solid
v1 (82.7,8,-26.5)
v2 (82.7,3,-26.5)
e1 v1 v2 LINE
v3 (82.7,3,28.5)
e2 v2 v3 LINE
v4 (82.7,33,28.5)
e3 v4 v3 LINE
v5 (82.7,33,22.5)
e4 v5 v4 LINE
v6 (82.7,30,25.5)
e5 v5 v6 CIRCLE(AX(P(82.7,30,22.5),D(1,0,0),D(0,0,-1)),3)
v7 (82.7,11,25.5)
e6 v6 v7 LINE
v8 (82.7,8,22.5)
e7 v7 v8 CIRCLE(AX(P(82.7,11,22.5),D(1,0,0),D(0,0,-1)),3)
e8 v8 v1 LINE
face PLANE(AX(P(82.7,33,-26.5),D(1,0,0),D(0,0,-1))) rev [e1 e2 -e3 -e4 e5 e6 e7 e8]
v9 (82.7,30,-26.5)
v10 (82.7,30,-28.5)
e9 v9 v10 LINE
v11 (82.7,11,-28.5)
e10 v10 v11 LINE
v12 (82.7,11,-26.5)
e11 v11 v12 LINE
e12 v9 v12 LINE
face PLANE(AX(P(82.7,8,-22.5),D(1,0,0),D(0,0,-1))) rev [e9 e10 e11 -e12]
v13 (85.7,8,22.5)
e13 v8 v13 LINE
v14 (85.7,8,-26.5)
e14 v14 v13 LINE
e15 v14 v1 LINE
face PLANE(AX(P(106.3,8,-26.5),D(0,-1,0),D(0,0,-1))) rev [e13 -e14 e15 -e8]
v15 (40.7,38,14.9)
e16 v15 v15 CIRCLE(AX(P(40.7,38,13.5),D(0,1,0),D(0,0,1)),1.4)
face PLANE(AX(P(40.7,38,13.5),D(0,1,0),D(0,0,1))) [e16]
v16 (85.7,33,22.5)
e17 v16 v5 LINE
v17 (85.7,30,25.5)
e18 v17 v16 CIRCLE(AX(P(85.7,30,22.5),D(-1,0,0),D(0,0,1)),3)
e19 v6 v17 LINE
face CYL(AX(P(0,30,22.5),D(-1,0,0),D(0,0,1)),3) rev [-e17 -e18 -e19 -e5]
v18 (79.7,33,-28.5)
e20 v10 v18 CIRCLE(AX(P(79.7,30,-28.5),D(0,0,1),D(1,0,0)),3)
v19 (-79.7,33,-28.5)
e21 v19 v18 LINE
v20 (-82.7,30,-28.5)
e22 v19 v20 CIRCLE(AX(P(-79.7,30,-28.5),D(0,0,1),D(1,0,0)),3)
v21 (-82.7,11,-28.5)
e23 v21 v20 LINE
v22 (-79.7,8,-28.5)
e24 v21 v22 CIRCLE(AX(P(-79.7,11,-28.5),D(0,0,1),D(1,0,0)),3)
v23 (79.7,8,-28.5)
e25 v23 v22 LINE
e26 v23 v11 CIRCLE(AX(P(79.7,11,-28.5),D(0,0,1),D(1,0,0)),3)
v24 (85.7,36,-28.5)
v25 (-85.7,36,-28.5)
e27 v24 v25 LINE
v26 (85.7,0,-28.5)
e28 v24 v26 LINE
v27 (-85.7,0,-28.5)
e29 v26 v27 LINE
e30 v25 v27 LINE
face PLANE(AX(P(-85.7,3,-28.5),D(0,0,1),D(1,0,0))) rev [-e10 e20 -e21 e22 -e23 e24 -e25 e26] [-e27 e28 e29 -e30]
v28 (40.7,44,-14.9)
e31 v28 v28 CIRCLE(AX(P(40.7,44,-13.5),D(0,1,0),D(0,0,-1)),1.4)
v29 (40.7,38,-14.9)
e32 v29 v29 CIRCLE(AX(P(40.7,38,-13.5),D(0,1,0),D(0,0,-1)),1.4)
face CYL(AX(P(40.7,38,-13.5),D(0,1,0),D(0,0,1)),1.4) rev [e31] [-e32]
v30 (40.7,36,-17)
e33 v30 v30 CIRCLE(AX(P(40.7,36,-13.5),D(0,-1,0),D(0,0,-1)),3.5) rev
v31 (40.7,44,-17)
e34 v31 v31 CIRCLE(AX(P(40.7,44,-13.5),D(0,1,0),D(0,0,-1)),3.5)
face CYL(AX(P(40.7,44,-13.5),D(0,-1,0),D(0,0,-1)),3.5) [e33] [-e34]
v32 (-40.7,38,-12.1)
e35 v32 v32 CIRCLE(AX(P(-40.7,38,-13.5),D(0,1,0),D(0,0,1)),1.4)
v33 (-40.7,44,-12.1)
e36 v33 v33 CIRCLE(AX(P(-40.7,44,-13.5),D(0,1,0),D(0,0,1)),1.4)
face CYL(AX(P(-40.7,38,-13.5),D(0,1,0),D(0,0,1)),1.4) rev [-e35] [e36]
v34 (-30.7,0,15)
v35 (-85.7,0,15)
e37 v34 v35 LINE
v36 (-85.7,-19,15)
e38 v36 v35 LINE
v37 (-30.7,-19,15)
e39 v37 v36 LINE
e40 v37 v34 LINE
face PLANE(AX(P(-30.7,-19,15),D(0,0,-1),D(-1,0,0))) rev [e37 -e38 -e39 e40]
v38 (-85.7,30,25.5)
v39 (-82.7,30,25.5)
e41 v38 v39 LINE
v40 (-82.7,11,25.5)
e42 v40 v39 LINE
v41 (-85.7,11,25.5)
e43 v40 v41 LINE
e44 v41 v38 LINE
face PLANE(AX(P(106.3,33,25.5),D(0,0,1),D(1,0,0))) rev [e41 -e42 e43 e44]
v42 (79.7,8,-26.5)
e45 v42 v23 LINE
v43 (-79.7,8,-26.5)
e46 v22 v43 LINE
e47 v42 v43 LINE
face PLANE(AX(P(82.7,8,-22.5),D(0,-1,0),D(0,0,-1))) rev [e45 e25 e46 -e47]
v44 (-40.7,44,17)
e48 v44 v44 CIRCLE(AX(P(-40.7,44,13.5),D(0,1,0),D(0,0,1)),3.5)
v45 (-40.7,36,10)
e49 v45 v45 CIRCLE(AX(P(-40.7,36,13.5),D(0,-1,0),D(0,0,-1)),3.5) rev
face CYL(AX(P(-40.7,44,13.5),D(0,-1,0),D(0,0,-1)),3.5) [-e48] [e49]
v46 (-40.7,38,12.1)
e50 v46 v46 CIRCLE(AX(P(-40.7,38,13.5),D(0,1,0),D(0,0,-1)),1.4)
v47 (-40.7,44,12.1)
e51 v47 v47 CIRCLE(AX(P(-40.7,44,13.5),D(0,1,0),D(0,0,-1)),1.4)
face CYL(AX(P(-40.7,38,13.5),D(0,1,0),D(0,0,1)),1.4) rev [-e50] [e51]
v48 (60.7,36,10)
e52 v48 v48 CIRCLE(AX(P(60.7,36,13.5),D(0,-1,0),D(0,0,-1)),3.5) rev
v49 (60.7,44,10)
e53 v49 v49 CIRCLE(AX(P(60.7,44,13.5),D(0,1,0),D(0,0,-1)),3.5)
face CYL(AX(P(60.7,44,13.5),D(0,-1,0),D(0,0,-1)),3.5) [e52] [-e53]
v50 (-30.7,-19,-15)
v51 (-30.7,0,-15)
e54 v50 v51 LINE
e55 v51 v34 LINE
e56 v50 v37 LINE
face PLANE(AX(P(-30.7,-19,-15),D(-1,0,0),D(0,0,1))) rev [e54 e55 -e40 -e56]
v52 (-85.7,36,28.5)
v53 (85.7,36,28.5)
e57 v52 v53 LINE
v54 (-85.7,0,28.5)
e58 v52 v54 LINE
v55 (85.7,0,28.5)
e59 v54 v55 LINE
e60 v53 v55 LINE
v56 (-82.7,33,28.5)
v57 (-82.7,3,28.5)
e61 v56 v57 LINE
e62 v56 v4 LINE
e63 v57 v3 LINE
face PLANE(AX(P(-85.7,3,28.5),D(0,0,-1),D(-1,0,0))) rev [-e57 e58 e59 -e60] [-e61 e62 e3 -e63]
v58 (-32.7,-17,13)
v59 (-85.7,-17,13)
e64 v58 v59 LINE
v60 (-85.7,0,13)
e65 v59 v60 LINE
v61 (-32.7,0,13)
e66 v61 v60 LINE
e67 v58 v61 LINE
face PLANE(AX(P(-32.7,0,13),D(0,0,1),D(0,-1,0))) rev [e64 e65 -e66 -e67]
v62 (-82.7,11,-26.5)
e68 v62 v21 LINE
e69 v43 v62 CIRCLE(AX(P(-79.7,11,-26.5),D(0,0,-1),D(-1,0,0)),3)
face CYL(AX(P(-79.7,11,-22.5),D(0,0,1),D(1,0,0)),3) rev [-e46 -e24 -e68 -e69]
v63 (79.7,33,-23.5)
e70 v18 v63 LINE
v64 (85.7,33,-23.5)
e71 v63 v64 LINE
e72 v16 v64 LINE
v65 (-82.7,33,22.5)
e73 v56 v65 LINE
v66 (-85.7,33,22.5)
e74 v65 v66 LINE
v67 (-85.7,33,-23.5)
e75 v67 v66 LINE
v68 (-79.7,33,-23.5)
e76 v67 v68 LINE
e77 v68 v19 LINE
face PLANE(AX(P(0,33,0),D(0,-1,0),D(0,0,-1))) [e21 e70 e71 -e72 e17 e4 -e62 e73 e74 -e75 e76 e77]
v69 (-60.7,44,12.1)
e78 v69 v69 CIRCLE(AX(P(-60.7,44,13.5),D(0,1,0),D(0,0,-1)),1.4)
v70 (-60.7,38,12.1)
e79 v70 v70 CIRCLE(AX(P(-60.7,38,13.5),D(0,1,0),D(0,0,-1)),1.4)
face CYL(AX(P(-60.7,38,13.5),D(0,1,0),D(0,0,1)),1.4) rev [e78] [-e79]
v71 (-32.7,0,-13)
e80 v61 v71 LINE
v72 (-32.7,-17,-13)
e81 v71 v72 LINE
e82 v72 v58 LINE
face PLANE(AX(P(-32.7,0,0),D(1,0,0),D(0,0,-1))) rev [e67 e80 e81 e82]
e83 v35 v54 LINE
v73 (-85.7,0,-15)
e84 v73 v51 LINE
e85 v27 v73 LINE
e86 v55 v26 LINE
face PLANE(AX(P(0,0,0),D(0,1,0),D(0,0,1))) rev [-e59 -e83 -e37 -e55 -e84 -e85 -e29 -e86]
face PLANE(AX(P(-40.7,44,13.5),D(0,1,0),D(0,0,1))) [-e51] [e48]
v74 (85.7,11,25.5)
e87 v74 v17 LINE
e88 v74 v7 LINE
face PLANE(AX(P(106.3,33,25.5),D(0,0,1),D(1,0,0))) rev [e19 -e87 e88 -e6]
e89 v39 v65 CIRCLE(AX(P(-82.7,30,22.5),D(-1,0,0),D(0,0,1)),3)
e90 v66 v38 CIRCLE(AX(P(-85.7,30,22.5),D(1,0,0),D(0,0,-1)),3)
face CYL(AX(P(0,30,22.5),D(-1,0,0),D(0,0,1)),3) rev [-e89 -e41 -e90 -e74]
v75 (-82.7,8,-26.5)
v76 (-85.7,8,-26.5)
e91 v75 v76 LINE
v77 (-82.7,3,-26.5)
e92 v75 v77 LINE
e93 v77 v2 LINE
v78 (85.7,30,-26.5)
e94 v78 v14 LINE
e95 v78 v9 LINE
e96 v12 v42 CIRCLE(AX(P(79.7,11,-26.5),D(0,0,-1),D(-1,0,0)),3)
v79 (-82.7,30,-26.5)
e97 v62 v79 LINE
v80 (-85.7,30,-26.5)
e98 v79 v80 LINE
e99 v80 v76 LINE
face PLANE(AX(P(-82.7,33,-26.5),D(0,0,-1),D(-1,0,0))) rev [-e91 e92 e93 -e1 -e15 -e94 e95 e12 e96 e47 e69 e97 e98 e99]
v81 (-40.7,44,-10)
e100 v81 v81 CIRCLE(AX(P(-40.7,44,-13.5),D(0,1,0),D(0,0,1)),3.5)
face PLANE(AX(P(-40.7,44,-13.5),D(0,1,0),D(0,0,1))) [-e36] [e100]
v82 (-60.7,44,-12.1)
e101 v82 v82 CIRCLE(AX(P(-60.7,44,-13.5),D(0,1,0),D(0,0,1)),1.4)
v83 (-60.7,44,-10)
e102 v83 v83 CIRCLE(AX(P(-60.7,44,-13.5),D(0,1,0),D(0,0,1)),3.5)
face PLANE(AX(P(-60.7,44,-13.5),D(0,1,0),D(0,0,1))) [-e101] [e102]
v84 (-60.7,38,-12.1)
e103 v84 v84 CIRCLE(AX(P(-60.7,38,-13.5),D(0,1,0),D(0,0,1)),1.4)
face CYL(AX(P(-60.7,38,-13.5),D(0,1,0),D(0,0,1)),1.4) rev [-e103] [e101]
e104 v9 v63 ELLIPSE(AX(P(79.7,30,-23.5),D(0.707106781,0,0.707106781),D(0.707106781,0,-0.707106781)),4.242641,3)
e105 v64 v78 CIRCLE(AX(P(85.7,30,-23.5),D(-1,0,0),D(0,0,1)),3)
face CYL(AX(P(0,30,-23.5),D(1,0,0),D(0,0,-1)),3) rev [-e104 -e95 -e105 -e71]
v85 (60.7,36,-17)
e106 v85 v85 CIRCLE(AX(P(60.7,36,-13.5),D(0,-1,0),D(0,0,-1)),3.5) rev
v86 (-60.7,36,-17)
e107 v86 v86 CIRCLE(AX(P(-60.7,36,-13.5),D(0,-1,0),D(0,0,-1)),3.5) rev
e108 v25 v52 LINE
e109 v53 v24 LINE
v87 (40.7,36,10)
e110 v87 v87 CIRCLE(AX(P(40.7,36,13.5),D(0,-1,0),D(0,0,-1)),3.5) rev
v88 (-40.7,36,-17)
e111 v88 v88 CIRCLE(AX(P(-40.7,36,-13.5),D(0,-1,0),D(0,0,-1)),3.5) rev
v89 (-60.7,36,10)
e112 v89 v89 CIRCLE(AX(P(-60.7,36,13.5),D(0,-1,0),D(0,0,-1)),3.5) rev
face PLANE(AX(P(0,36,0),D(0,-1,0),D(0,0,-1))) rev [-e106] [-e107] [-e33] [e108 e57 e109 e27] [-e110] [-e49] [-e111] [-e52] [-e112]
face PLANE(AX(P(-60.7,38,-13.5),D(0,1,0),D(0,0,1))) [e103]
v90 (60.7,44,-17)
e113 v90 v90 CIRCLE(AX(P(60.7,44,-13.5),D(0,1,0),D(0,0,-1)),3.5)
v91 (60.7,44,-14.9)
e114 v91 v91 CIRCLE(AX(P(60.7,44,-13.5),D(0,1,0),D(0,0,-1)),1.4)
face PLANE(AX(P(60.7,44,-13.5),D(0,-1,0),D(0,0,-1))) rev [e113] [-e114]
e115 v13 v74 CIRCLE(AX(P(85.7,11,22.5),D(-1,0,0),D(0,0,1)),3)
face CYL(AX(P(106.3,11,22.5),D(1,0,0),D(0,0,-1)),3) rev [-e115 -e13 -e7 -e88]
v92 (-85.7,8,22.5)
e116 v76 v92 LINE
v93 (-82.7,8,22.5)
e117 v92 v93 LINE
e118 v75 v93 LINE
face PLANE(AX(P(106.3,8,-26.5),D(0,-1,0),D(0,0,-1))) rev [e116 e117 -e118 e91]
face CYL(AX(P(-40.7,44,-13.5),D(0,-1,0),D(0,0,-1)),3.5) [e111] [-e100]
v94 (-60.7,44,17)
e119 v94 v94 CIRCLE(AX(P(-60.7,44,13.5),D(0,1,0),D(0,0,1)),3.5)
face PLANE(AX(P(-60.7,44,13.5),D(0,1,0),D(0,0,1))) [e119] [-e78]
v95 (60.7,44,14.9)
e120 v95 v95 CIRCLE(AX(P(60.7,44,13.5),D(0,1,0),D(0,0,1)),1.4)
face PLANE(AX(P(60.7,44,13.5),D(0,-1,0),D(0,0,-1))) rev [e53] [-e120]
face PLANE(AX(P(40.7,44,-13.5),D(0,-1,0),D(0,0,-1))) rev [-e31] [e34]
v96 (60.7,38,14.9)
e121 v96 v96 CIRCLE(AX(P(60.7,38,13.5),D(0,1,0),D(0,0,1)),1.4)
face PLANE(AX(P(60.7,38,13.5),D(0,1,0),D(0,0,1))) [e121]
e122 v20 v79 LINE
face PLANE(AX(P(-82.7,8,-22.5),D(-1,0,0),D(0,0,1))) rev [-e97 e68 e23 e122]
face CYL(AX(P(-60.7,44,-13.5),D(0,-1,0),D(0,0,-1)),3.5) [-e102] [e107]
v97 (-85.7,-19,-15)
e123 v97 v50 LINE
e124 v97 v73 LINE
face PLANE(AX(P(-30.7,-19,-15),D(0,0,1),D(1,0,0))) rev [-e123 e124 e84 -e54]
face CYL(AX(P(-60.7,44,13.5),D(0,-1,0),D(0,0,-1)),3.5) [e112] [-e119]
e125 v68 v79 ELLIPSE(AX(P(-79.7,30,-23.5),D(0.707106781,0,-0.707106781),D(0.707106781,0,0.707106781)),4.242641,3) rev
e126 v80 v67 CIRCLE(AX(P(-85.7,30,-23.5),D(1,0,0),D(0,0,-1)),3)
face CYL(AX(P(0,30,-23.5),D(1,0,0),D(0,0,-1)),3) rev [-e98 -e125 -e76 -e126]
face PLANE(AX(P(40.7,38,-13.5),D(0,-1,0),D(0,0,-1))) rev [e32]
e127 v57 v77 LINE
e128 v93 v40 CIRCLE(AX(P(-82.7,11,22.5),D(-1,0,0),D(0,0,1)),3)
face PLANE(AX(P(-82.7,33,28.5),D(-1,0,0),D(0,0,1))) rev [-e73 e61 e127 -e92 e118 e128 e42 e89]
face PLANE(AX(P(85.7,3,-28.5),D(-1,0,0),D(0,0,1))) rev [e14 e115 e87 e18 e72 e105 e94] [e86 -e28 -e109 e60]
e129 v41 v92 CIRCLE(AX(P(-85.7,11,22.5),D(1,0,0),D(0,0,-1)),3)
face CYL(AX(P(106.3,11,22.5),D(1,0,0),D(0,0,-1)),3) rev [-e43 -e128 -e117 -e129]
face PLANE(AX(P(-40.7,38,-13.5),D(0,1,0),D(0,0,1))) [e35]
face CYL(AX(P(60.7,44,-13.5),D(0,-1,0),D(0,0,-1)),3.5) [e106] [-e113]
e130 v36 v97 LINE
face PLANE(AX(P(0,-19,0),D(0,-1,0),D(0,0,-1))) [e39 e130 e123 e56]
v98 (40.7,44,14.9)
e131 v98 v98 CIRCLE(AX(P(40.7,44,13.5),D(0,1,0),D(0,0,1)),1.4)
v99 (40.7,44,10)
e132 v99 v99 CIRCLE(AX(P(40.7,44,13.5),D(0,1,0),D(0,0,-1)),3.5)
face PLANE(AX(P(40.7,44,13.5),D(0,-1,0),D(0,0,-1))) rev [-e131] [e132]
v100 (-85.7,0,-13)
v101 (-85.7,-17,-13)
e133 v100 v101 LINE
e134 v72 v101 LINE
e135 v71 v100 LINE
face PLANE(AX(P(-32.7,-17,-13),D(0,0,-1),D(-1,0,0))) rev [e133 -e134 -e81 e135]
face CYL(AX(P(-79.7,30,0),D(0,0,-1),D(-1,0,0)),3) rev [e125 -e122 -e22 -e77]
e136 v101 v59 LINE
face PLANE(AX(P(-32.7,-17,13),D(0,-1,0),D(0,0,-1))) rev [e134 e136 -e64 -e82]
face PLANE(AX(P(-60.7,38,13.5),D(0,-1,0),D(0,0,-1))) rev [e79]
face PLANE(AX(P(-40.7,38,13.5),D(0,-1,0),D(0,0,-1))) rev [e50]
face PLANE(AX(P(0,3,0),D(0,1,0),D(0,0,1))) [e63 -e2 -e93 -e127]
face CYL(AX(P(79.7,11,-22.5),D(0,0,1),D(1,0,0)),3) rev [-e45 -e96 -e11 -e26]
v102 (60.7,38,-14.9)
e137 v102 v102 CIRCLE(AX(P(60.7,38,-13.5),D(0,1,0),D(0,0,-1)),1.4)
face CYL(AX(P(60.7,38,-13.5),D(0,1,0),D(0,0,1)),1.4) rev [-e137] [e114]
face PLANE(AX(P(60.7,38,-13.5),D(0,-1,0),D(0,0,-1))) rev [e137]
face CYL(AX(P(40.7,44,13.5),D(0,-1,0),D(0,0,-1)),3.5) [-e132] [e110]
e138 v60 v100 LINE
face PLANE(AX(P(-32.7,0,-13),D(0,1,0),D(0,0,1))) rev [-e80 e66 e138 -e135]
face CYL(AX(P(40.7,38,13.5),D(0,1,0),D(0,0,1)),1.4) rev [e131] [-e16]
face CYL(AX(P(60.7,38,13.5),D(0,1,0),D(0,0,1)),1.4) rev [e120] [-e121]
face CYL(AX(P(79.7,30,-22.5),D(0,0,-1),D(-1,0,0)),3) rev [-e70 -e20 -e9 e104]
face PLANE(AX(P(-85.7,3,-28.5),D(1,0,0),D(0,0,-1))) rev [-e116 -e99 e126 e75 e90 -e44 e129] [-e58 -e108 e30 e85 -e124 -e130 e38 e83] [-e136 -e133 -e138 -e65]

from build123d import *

# Parameters (mm, degrees)
SKETCH1_W           = 171.4
SKETCH1_H           = 57
BOSS_EXTRUDE1_DEPTH = 3
BOSS_EXTRUDE2_DEPTH = 30
SKETCH3_W           = 52
SKETCH3_H           = 25
CUT_EXTRUDE1_DEPTH  = 192
SKETCH4_W           = 171.4
SKETCH4_H           = 57
BOSS_EXTRUDE3_DEPTH = 3
SKETCH5_R           = 3.5
BOSS_EXTRUDE4_DEPTH = 8
SKETCH6_R           = 1.4
CUT_EXTRUDE2_DEPTH  = 6
SKETCH8_W           = 165.4
SKETCH8_H           = 25
CUT_EXTRUDE3_DEPTH  = 6
FILLET2_START       = -85.7
FILLET2_DEPTH       = 3
FILLET2_START_2     = 82.7
FILLET2_2_DEPTH     = 3
FILLET2_START_3     = -28.5
FILLET2_3_DEPTH     = 5
FILLET2_4_DEPTH     = 2
FILLET2_START_4     = -82.7
FILLET2_5_DEPTH     = 165.4
SKETCH9_W           = 55
SKETCH9_H           = 30
BOSS_EXTRUDE5_DEPTH = 19
SKETCH10_W          = 26
SKETCH10_H          = 17
CUT_EXTRUDE4_DEPTH  = 53


with BuildPart() as part:
    # Sketch1 → Boss-Extrude1 (new body)
    with BuildSketch(Plane(origin=(0, 0, 0), x_dir=(1, 0, 0), z_dir=(0, 1, 0))):
        Rectangle(SKETCH1_W, SKETCH1_H)
    extrude(amount=BOSS_EXTRUDE1_DEPTH)

    # Sketch2 → Boss-Extrude2 (add)
    with BuildSketch(Plane(origin=(0, 3, 0), x_dir=(1, 0, 0), z_dir=(0, 1, 0))):
        Polygon((-85.7, -28.5), (-82.7, -28.5), (-82.7, 26.5), (82.7, 26.5), (82.7, -28.5), (85.7, -28.5), (85.7, 28.5), (-85.7, 28.5), align=None)
    extrude(amount=BOSS_EXTRUDE2_DEPTH)

    # Sketch3 → Cut-Extrude1 (cut)
    with BuildSketch(Plane.ZY.offset(85.7)):
        with Locations((-0.5, 20.5)):
            Rectangle(SKETCH3_W, SKETCH3_H)
    extrude(amount=-CUT_EXTRUDE1_DEPTH, mode=Mode.SUBTRACT)

    # Sketch4 → Boss-Extrude3 (add)
    with BuildSketch(Plane(origin=(0, 33, 0), x_dir=(1, 0, 0), z_dir=(0, 1, 0))):
        Rectangle(SKETCH4_W, SKETCH4_H)
    extrude(amount=BOSS_EXTRUDE3_DEPTH)

    # Sketch5 → Boss-Extrude4 (add)
    with BuildSketch(Plane(origin=(0, 36, 0), x_dir=(1, 0, 0), z_dir=(0, 1, 0))):
        with Locations(Location((-60.7, 13.5, 0), (0, 0, 90))):
            Circle(SKETCH5_R)
        with Locations(Location((-40.7, 13.5, 0), (0, 0, 90))):
            Circle(SKETCH5_R)
        with Locations(Location((-40.7, -13.5, 0), (0, 0, 90))):
            Circle(SKETCH5_R)
        with Locations(Location((-60.7, -13.5, 0), (0, 0, 90))):
            Circle(SKETCH5_R)
        with Locations(Location((60.7, -13.5, 0), (0, 0, 90))):
            Circle(SKETCH5_R)
        with Locations(Location((40.7, -13.5, 0), (0, 0, 90))):
            Circle(SKETCH5_R)
        with Locations(Location((40.7, 13.5, 0), (0, 0, 90))):
            Circle(SKETCH5_R)
        with Locations(Location((60.7, 13.5, 0), (0, 0, 90))):
            Circle(SKETCH5_R)
    extrude(amount=BOSS_EXTRUDE4_DEPTH)

    # Sketch6 → Cut-Extrude2 (cut)
    with BuildSketch(Plane(origin=(0, 44, 0), x_dir=(1, 0, 0), z_dir=(0, 1, 0))):
        with Locations(Location((-60.7, 13.5, 0), (0, 0, 270))):
            Circle(SKETCH6_R)
        with Locations(Location((-40.7, 13.5, 0), (0, 0, 270))):
            Circle(SKETCH6_R)
        with Locations(Location((-40.7, -13.5, 0), (0, 0, 90))):
            Circle(SKETCH6_R)
        with Locations(Location((-60.7, -13.5, 0), (0, 0, 90))):
            Circle(SKETCH6_R)
        with Locations(Location((60.7, -13.5, 0), (0, 0, 270))):
            Circle(SKETCH6_R)
        with Locations(Location((40.7, -13.5, 0), (0, 0, 270))):
            Circle(SKETCH6_R)
        with Locations(Location((40.7, 13.5, 0), (0, 0, 90))):
            Circle(SKETCH6_R)
        with Locations(Location((60.7, 13.5, 0), (0, 0, 90))):
            Circle(SKETCH6_R)
    extrude(amount=-CUT_EXTRUDE2_DEPTH, mode=Mode.SUBTRACT)

    # Sketch8 → Cut-Extrude3 (cut)
    with BuildSketch(Plane(origin=(0, 0, -28.5), x_dir=(-1, 0, 0), z_dir=(0, 0, -1))):
        with Locations((0, 20.5)):
            Rectangle(SKETCH8_W, SKETCH8_H)
    extrude(amount=-CUT_EXTRUDE3_DEPTH, mode=Mode.SUBTRACT)

    # Fillet2: read off the stored shape, not the designer's step
    # Fillet2 outline → Fillet2 (add)
    with BuildSketch(Plane.YZ.offset(FILLET2_START)):
        with BuildLine():
            ThreePointArc((33, -23.5), (32.121320344, -25.621320344), (30, -26.5))
            Line((30, -26.5), (33, -26.5))
            Line((33, -26.5), (33, -23.5))
        make_face()
        with BuildLine():
            ThreePointArc((30, 25.5), (32.121320344, 24.621320344), (33, 22.5))
            Line((33, 22.5), (33, 25.5))
            Line((33, 25.5), (30, 25.5))
        make_face()
        with BuildLine():
            Line((8, 25.5), (8, 22.5))
            ThreePointArc((8, 22.5), (8.878679656, 24.621320344), (11, 25.5))
            Line((11, 25.5), (8, 25.5))
        make_face()
    extrude(amount=FILLET2_DEPTH)

    # Fillet2 2 outline → Fillet2 2 (add)
    with BuildSketch(Plane.YZ.offset(FILLET2_START_2)):
        with BuildLine():
            ThreePointArc((33, -23.5), (32.121320344, -25.621320344), (30, -26.5))
            Line((30, -26.5), (33, -26.5))
            Line((33, -26.5), (33, -23.5))
        make_face()
        with BuildLine():
            ThreePointArc((30, 25.5), (32.121320344, 24.621320344), (33, 22.5))
            Line((33, 22.5), (33, 25.5))
            Line((33, 25.5), (30, 25.5))
        make_face()
        with BuildLine():
            Line((8, 25.5), (8, 22.5))
            ThreePointArc((8, 22.5), (8.878679656, 24.621320344), (11, 25.5))
            Line((11, 25.5), (8, 25.5))
        make_face()
    extrude(amount=FILLET2_2_DEPTH)

    # Fillet2 3 outline → Fillet2 3 (add)
    with BuildSketch(Plane.XY.offset(FILLET2_START_3)):
        with BuildLine():
            Line((82.7, 33), (79.7, 33))
            ThreePointArc((79.7, 33), (81.821320344, 32.121320344), (82.7, 30))
            Line((82.7, 30), (82.7, 33))
        make_face()
        with BuildLine():
            ThreePointArc((-82.7, 30), (-81.821320344, 32.121320344), (-79.7, 33))
            Line((-79.7, 33), (-82.7, 33))
            Line((-82.7, 33), (-82.7, 30))
        make_face()
    extrude(amount=FILLET2_3_DEPTH)

    # Fillet2 4 outline → Fillet2 4 (add)
    with BuildSketch(Plane.XY.offset(FILLET2_START_3)):
        with BuildLine():
            Line((82.7, 8), (82.7, 11))
            ThreePointArc((82.7, 11), (81.821320344, 8.878679656), (79.7, 8))
            Line((79.7, 8), (82.7, 8))
        make_face()
        with BuildLine():
            ThreePointArc((-79.7, 8), (-81.821320344, 8.878679656), (-82.7, 11))
            Line((-82.7, 11), (-82.7, 8))
            Line((-82.7, 8), (-79.7, 8))
        make_face()
    extrude(amount=FILLET2_4_DEPTH)

    # Fillet2 5 outline → Fillet2 5 (cut)
    with BuildSketch(Plane.YZ.offset(FILLET2_START_4)):
        with BuildLine():
            Line((30, -23.5), (30, -26.5))
            ThreePointArc((30, -26.5), (32.121320344, -25.621320344), (33, -23.5))
            Line((33, -23.5), (30, -23.5))
        make_face()
    extrude(amount=FILLET2_5_DEPTH, mode=Mode.SUBTRACT)

    # Sketch9 → Boss-Extrude5 (add)
    with BuildSketch(Plane.XZ):
        with Locations((-58.2, 0)):
            Rectangle(SKETCH9_W, SKETCH9_H)
    extrude(amount=BOSS_EXTRUDE5_DEPTH)

    # Sketch10 → Cut-Extrude4 (cut)
    with BuildSketch(Plane.ZY.offset(85.7)):
        with Locations((0, -8.5)):
            Rectangle(SKETCH10_W, SKETCH10_H)
    extrude(amount=-CUT_EXTRUDE4_DEPTH, mode=Mode.SUBTRACT)


solid = part.part
